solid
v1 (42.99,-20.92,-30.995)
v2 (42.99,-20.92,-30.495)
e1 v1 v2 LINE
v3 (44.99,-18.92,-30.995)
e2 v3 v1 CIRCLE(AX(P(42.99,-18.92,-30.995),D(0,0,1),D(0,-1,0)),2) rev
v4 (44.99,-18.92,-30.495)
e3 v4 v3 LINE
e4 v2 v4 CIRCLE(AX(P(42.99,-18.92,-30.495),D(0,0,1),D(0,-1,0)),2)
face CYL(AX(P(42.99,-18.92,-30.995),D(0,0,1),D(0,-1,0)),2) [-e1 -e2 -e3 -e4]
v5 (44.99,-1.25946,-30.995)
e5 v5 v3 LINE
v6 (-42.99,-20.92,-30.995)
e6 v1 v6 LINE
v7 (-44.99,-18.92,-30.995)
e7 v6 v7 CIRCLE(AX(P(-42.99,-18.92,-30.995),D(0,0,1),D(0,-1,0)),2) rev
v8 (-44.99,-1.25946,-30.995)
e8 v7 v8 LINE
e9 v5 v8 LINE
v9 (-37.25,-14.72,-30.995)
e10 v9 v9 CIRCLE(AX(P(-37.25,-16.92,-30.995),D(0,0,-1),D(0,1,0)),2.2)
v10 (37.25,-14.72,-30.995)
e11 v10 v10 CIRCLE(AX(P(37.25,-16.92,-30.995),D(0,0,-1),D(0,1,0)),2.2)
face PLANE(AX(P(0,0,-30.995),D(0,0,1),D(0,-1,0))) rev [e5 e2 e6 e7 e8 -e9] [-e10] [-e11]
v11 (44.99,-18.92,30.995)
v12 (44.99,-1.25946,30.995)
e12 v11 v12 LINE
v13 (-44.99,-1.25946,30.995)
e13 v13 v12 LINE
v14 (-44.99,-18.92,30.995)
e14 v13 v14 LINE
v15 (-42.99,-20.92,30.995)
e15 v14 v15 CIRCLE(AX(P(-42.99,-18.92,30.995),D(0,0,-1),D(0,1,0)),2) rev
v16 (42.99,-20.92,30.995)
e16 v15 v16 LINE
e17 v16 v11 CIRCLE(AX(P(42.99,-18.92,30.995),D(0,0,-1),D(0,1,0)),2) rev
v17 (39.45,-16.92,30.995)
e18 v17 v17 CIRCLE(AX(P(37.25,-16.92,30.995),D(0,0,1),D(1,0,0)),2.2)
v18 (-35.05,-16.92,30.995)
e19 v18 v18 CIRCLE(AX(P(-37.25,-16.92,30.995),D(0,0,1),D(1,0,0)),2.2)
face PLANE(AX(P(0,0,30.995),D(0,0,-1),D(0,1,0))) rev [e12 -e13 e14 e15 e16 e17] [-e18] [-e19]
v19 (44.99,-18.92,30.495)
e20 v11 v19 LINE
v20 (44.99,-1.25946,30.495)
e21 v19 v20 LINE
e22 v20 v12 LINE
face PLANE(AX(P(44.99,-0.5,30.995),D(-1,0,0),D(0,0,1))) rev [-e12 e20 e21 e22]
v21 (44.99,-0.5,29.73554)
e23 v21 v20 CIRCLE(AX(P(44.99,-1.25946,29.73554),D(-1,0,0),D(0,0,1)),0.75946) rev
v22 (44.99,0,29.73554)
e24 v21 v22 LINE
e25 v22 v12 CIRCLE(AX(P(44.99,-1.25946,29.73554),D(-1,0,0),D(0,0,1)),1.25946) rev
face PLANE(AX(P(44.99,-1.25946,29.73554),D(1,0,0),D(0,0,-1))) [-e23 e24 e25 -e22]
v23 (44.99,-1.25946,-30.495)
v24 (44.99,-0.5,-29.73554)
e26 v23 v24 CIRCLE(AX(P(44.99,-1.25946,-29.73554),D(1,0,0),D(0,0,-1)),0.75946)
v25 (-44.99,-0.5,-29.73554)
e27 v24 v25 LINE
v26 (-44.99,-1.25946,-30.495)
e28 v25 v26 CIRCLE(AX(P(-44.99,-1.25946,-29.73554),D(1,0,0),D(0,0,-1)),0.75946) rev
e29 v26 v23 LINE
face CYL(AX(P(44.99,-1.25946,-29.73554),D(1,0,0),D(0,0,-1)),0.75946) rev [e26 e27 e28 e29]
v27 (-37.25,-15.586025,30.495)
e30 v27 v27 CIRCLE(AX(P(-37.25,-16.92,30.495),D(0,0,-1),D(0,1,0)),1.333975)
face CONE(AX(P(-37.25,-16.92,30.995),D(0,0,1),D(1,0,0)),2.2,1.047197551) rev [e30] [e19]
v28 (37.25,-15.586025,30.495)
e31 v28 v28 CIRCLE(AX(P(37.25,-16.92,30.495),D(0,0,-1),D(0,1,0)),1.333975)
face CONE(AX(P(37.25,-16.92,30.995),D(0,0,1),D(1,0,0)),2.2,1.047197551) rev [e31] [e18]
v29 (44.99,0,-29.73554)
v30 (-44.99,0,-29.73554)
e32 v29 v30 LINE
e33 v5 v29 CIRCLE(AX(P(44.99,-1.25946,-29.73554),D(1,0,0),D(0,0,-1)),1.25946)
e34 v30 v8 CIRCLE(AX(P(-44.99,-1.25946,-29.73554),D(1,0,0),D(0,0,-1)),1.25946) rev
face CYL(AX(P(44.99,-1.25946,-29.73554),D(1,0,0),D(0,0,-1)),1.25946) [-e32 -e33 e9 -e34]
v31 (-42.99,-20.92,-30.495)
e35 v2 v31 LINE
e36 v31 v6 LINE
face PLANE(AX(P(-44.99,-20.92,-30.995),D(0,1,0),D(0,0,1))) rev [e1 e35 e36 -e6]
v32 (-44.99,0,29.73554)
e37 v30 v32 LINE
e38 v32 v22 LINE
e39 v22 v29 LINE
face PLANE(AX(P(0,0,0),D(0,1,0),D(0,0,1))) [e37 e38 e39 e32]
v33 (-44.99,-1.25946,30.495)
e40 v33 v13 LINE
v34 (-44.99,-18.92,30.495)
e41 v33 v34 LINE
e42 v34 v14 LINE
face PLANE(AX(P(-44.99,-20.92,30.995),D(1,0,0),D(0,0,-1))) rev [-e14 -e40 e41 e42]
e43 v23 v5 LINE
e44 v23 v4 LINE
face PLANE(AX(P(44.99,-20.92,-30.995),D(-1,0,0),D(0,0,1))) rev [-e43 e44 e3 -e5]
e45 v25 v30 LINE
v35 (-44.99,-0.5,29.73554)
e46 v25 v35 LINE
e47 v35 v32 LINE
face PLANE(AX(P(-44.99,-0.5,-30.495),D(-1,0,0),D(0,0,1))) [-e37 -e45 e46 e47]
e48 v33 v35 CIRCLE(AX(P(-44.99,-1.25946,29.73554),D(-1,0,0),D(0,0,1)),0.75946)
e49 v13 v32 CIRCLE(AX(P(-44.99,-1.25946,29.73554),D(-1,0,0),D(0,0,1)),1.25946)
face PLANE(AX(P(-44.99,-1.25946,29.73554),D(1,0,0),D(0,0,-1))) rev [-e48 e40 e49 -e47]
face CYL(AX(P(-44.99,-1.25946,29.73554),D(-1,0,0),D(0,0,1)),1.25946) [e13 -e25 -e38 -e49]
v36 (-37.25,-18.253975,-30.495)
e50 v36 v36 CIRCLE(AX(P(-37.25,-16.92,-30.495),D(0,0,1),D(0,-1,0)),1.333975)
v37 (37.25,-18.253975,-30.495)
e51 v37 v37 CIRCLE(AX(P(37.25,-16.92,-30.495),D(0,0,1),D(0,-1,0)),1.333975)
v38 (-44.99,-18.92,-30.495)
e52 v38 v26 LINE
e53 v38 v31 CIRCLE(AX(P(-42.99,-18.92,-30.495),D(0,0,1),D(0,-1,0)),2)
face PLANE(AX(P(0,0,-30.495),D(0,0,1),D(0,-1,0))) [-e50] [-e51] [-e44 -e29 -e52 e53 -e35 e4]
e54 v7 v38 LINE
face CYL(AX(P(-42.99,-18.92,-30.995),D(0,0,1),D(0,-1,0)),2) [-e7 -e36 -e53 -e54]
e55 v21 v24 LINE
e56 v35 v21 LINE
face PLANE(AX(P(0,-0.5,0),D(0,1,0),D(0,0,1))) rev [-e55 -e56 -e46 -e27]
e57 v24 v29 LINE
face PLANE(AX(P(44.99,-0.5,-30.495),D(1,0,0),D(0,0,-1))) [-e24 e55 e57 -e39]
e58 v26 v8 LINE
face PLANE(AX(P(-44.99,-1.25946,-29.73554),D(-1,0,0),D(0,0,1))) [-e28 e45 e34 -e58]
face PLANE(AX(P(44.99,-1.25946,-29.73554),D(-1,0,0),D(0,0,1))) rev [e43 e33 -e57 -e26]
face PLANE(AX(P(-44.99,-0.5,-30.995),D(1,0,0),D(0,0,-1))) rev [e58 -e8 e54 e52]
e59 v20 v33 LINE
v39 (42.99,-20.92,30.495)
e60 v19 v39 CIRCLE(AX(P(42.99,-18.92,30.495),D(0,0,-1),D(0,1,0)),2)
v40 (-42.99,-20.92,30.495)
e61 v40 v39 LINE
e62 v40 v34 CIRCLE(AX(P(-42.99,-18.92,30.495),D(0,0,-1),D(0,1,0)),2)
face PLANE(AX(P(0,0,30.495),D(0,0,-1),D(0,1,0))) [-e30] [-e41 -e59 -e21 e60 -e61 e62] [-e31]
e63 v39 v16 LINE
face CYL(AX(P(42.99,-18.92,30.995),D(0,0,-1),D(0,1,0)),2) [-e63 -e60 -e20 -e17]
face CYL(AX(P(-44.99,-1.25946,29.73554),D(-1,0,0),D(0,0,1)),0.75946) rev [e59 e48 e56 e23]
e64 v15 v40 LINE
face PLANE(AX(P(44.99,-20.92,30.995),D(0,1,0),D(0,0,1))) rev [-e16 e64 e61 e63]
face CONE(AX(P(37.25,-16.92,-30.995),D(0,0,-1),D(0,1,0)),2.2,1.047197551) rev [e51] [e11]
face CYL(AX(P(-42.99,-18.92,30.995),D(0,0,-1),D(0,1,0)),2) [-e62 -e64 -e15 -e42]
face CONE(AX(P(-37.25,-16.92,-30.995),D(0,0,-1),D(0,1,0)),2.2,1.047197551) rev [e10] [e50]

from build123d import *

# Parameters (mm, degrees)
SKETCH1_W                                      = 89.98
SKETCH1_H                                      = 60.99
BASE_FLANGE1_DEPTH                             = 0.5
EDGE_FLANGE1_STRIP_W                           = 3.51892
EDGE_FLANGE1_STRIP_H                           = 0.5
EDGE_FLANGE1_STRIP_CUT_DEPTH                   = 89.98
EDGE_FLANGE1_STRIP_2_W                         = 3.51892
EDGE_FLANGE1_STRIP_2_H                         = 0.5
EDGE_FLANGE1_STRIP_CUT_2_DEPTH                 = 89.98
EDGE_FLANGE1_DEPTH                             = 89.98
EDGE_FLANGE1_BEND_DEPTH                        = 89.98
CSK_FOR_M2_FLAT_HEAD_MACHINE_SCREW1_AT_2_COUNT = 2
CSK_FOR_M2_FLAT_HEAD_MACHINE_SCREW1_AT_2_PITCH = 74.5
CSK_FOR_M2_FLAT_HEAD_MACHINE_SCREW2_AT_2_COUNT = 2
CSK_FOR_M2_FLAT_HEAD_MACHINE_SCREW2_AT_2_PITCH = 74.5
FILLET1_R                                      = 2


# Sheet-metal steps are written as plain solids
with BuildPart() as part:
    # Sketch1 → Base-Flange1 (new body)
    with BuildSketch(Plane(origin=(0, 0, 0), x_dir=(1, 0, 0), z_dir=(0, 1, 0))):
        Rectangle(SKETCH1_W, SKETCH1_H)
    extrude(amount=-BASE_FLANGE1_DEPTH)

    # Edge-Flange1 strip (across the edge) → Edge-Flange1 strip cut (cut)
    with BuildSketch(Plane(origin=(44.99, -0.5, 30.495), x_dir=(0, 0, -1), z_dir=(-1, 0, 0))):
        with Locations((-1, -0.25)):
            Rectangle(EDGE_FLANGE1_STRIP_W, EDGE_FLANGE1_STRIP_H)
    extrude(amount=EDGE_FLANGE1_STRIP_CUT_DEPTH, mode=Mode.SUBTRACT)

    # Edge-Flange1 strip 2 (across the edge) → Edge-Flange1 strip cut 2 (cut)
    with BuildSketch(Plane(origin=(-44.99, -0.5, -30.495), x_dir=(0, 0, 1), z_dir=(1, 0, 0))):
        with Locations((-1, -0.25)):
            Rectangle(EDGE_FLANGE1_STRIP_2_W, EDGE_FLANGE1_STRIP_2_H)
    extrude(amount=EDGE_FLANGE1_STRIP_CUT_2_DEPTH, mode=Mode.SUBTRACT)

    # Edge-Flange1 section (across the edge) → Edge-Flange1 (add)
    with BuildSketch(Plane(origin=(44.99, -0.5, 30.495), x_dir=(0, 0, -1), z_dir=(-1, 0, 0))):
        with BuildLine():
            Line((-0.5, 0.75946), (-0.5, 20.42))
            Line((-0.5, 20.42), (0, 20.42))
            Line((0, 20.42), (0, 0.75946))
            ThreePointArc((0, 0.75946), (0.222440684, 0.222440684), (0.75946, 0))
            Line((0.75946, 0), (0.75946, -0.5))
            ThreePointArc((0.75946, -0.5), (-0.131112707, -0.131112707), (-0.5, 0.75946))
        make_face()
    extrude(amount=EDGE_FLANGE1_DEPTH)

    # Edge-Flange1 section 2 (across the edge) → Edge-Flange1 bend (add)
    with BuildSketch(Plane(origin=(-44.99, -0.5, -30.495), x_dir=(0, 0, 1), z_dir=(1, 0, 0))):
        with BuildLine():
            Line((-0.5, 0.75946), (-0.5, 20.42))
            Line((-0.5, 20.42), (0, 20.42))
            Line((0, 20.42), (0, 0.75946))
            ThreePointArc((0, 0.75946), (0.222440684, 0.222440684), (0.75946, 0))
            Line((0.75946, 0), (0.75946, -0.5))
            ThreePointArc((0.75946, -0.5), (-0.131112707, -0.131112707), (-0.5, 0.75946))
        make_face()
    extrude(amount=EDGE_FLANGE1_BEND_DEPTH)

    # Sketch14 → CSK for M2 Flat Head Machine Screw1 (revolve, cut)
    with BuildSketch(Plane(origin=(-37.25, -16.92, 30.995), x_dir=(0, -1, 0), z_dir=(1, 0, 0))):
        Polygon((0, 0), (0, 0.5), (1.2, 0.5), (1.2, 0.577350269), (2.2, 0), align=None)
    csk_for_m2_flat_head_machine_screw1 = revolve(axis=Axis((-37.25, -16.92, 37.345), (0, 0, -1)), mode=Mode.SUBTRACT)

    # CSK for M2 Flat Head Machine Screw1 at 2: CSK for M2 Flat Head Machine Screw1 ×2
    with Locations(*[(i * CSK_FOR_M2_FLAT_HEAD_MACHINE_SCREW1_AT_2_PITCH, 0, 0) for i in range(1, CSK_FOR_M2_FLAT_HEAD_MACHINE_SCREW1_AT_2_COUNT)]):
        add(csk_for_m2_flat_head_machine_screw1, mode=Mode.SUBTRACT)

    # Sketch20 → CSK for M2 Flat Head Machine Screw2 (revolve, cut)
    with BuildSketch(Plane(origin=(37.25, -16.92, -30.995), x_dir=(0, 1, 0), z_dir=(1, 0, 0))):
        Polygon((0, 0), (0, 0.5), (1.2, 0.5), (1.2, 0.577350269), (2.2, 0), align=None)
    csk_for_m2_flat_head_machine_screw2 = revolve(axis=Axis((37.25, -16.92, -37.345), (0, 0, 1)), mode=Mode.SUBTRACT)

    # CSK for M2 Flat Head Machine Screw2 at 2: CSK for M2 Flat Head Machine Screw2 ×2
    with Locations(*[(-i * CSK_FOR_M2_FLAT_HEAD_MACHINE_SCREW2_AT_2_PITCH, 0, 0) for i in range(1, CSK_FOR_M2_FLAT_HEAD_MACHINE_SCREW2_AT_2_COUNT)]):
        add(csk_for_m2_flat_head_machine_screw2, mode=Mode.SUBTRACT)

    # Fillet1
    fillet1_edges = [part.edges().sort_by_distance(p)[0] for p in [
        (44.99, -20.92, 30.745),
        (-44.99, -20.92, 30.745),
        (-44.99, -20.92, -30.745),
        (44.99, -20.92, -30.745),
    ]]
    fillet(fillet1_edges, radius=FILLET1_R)


solid = part.part
